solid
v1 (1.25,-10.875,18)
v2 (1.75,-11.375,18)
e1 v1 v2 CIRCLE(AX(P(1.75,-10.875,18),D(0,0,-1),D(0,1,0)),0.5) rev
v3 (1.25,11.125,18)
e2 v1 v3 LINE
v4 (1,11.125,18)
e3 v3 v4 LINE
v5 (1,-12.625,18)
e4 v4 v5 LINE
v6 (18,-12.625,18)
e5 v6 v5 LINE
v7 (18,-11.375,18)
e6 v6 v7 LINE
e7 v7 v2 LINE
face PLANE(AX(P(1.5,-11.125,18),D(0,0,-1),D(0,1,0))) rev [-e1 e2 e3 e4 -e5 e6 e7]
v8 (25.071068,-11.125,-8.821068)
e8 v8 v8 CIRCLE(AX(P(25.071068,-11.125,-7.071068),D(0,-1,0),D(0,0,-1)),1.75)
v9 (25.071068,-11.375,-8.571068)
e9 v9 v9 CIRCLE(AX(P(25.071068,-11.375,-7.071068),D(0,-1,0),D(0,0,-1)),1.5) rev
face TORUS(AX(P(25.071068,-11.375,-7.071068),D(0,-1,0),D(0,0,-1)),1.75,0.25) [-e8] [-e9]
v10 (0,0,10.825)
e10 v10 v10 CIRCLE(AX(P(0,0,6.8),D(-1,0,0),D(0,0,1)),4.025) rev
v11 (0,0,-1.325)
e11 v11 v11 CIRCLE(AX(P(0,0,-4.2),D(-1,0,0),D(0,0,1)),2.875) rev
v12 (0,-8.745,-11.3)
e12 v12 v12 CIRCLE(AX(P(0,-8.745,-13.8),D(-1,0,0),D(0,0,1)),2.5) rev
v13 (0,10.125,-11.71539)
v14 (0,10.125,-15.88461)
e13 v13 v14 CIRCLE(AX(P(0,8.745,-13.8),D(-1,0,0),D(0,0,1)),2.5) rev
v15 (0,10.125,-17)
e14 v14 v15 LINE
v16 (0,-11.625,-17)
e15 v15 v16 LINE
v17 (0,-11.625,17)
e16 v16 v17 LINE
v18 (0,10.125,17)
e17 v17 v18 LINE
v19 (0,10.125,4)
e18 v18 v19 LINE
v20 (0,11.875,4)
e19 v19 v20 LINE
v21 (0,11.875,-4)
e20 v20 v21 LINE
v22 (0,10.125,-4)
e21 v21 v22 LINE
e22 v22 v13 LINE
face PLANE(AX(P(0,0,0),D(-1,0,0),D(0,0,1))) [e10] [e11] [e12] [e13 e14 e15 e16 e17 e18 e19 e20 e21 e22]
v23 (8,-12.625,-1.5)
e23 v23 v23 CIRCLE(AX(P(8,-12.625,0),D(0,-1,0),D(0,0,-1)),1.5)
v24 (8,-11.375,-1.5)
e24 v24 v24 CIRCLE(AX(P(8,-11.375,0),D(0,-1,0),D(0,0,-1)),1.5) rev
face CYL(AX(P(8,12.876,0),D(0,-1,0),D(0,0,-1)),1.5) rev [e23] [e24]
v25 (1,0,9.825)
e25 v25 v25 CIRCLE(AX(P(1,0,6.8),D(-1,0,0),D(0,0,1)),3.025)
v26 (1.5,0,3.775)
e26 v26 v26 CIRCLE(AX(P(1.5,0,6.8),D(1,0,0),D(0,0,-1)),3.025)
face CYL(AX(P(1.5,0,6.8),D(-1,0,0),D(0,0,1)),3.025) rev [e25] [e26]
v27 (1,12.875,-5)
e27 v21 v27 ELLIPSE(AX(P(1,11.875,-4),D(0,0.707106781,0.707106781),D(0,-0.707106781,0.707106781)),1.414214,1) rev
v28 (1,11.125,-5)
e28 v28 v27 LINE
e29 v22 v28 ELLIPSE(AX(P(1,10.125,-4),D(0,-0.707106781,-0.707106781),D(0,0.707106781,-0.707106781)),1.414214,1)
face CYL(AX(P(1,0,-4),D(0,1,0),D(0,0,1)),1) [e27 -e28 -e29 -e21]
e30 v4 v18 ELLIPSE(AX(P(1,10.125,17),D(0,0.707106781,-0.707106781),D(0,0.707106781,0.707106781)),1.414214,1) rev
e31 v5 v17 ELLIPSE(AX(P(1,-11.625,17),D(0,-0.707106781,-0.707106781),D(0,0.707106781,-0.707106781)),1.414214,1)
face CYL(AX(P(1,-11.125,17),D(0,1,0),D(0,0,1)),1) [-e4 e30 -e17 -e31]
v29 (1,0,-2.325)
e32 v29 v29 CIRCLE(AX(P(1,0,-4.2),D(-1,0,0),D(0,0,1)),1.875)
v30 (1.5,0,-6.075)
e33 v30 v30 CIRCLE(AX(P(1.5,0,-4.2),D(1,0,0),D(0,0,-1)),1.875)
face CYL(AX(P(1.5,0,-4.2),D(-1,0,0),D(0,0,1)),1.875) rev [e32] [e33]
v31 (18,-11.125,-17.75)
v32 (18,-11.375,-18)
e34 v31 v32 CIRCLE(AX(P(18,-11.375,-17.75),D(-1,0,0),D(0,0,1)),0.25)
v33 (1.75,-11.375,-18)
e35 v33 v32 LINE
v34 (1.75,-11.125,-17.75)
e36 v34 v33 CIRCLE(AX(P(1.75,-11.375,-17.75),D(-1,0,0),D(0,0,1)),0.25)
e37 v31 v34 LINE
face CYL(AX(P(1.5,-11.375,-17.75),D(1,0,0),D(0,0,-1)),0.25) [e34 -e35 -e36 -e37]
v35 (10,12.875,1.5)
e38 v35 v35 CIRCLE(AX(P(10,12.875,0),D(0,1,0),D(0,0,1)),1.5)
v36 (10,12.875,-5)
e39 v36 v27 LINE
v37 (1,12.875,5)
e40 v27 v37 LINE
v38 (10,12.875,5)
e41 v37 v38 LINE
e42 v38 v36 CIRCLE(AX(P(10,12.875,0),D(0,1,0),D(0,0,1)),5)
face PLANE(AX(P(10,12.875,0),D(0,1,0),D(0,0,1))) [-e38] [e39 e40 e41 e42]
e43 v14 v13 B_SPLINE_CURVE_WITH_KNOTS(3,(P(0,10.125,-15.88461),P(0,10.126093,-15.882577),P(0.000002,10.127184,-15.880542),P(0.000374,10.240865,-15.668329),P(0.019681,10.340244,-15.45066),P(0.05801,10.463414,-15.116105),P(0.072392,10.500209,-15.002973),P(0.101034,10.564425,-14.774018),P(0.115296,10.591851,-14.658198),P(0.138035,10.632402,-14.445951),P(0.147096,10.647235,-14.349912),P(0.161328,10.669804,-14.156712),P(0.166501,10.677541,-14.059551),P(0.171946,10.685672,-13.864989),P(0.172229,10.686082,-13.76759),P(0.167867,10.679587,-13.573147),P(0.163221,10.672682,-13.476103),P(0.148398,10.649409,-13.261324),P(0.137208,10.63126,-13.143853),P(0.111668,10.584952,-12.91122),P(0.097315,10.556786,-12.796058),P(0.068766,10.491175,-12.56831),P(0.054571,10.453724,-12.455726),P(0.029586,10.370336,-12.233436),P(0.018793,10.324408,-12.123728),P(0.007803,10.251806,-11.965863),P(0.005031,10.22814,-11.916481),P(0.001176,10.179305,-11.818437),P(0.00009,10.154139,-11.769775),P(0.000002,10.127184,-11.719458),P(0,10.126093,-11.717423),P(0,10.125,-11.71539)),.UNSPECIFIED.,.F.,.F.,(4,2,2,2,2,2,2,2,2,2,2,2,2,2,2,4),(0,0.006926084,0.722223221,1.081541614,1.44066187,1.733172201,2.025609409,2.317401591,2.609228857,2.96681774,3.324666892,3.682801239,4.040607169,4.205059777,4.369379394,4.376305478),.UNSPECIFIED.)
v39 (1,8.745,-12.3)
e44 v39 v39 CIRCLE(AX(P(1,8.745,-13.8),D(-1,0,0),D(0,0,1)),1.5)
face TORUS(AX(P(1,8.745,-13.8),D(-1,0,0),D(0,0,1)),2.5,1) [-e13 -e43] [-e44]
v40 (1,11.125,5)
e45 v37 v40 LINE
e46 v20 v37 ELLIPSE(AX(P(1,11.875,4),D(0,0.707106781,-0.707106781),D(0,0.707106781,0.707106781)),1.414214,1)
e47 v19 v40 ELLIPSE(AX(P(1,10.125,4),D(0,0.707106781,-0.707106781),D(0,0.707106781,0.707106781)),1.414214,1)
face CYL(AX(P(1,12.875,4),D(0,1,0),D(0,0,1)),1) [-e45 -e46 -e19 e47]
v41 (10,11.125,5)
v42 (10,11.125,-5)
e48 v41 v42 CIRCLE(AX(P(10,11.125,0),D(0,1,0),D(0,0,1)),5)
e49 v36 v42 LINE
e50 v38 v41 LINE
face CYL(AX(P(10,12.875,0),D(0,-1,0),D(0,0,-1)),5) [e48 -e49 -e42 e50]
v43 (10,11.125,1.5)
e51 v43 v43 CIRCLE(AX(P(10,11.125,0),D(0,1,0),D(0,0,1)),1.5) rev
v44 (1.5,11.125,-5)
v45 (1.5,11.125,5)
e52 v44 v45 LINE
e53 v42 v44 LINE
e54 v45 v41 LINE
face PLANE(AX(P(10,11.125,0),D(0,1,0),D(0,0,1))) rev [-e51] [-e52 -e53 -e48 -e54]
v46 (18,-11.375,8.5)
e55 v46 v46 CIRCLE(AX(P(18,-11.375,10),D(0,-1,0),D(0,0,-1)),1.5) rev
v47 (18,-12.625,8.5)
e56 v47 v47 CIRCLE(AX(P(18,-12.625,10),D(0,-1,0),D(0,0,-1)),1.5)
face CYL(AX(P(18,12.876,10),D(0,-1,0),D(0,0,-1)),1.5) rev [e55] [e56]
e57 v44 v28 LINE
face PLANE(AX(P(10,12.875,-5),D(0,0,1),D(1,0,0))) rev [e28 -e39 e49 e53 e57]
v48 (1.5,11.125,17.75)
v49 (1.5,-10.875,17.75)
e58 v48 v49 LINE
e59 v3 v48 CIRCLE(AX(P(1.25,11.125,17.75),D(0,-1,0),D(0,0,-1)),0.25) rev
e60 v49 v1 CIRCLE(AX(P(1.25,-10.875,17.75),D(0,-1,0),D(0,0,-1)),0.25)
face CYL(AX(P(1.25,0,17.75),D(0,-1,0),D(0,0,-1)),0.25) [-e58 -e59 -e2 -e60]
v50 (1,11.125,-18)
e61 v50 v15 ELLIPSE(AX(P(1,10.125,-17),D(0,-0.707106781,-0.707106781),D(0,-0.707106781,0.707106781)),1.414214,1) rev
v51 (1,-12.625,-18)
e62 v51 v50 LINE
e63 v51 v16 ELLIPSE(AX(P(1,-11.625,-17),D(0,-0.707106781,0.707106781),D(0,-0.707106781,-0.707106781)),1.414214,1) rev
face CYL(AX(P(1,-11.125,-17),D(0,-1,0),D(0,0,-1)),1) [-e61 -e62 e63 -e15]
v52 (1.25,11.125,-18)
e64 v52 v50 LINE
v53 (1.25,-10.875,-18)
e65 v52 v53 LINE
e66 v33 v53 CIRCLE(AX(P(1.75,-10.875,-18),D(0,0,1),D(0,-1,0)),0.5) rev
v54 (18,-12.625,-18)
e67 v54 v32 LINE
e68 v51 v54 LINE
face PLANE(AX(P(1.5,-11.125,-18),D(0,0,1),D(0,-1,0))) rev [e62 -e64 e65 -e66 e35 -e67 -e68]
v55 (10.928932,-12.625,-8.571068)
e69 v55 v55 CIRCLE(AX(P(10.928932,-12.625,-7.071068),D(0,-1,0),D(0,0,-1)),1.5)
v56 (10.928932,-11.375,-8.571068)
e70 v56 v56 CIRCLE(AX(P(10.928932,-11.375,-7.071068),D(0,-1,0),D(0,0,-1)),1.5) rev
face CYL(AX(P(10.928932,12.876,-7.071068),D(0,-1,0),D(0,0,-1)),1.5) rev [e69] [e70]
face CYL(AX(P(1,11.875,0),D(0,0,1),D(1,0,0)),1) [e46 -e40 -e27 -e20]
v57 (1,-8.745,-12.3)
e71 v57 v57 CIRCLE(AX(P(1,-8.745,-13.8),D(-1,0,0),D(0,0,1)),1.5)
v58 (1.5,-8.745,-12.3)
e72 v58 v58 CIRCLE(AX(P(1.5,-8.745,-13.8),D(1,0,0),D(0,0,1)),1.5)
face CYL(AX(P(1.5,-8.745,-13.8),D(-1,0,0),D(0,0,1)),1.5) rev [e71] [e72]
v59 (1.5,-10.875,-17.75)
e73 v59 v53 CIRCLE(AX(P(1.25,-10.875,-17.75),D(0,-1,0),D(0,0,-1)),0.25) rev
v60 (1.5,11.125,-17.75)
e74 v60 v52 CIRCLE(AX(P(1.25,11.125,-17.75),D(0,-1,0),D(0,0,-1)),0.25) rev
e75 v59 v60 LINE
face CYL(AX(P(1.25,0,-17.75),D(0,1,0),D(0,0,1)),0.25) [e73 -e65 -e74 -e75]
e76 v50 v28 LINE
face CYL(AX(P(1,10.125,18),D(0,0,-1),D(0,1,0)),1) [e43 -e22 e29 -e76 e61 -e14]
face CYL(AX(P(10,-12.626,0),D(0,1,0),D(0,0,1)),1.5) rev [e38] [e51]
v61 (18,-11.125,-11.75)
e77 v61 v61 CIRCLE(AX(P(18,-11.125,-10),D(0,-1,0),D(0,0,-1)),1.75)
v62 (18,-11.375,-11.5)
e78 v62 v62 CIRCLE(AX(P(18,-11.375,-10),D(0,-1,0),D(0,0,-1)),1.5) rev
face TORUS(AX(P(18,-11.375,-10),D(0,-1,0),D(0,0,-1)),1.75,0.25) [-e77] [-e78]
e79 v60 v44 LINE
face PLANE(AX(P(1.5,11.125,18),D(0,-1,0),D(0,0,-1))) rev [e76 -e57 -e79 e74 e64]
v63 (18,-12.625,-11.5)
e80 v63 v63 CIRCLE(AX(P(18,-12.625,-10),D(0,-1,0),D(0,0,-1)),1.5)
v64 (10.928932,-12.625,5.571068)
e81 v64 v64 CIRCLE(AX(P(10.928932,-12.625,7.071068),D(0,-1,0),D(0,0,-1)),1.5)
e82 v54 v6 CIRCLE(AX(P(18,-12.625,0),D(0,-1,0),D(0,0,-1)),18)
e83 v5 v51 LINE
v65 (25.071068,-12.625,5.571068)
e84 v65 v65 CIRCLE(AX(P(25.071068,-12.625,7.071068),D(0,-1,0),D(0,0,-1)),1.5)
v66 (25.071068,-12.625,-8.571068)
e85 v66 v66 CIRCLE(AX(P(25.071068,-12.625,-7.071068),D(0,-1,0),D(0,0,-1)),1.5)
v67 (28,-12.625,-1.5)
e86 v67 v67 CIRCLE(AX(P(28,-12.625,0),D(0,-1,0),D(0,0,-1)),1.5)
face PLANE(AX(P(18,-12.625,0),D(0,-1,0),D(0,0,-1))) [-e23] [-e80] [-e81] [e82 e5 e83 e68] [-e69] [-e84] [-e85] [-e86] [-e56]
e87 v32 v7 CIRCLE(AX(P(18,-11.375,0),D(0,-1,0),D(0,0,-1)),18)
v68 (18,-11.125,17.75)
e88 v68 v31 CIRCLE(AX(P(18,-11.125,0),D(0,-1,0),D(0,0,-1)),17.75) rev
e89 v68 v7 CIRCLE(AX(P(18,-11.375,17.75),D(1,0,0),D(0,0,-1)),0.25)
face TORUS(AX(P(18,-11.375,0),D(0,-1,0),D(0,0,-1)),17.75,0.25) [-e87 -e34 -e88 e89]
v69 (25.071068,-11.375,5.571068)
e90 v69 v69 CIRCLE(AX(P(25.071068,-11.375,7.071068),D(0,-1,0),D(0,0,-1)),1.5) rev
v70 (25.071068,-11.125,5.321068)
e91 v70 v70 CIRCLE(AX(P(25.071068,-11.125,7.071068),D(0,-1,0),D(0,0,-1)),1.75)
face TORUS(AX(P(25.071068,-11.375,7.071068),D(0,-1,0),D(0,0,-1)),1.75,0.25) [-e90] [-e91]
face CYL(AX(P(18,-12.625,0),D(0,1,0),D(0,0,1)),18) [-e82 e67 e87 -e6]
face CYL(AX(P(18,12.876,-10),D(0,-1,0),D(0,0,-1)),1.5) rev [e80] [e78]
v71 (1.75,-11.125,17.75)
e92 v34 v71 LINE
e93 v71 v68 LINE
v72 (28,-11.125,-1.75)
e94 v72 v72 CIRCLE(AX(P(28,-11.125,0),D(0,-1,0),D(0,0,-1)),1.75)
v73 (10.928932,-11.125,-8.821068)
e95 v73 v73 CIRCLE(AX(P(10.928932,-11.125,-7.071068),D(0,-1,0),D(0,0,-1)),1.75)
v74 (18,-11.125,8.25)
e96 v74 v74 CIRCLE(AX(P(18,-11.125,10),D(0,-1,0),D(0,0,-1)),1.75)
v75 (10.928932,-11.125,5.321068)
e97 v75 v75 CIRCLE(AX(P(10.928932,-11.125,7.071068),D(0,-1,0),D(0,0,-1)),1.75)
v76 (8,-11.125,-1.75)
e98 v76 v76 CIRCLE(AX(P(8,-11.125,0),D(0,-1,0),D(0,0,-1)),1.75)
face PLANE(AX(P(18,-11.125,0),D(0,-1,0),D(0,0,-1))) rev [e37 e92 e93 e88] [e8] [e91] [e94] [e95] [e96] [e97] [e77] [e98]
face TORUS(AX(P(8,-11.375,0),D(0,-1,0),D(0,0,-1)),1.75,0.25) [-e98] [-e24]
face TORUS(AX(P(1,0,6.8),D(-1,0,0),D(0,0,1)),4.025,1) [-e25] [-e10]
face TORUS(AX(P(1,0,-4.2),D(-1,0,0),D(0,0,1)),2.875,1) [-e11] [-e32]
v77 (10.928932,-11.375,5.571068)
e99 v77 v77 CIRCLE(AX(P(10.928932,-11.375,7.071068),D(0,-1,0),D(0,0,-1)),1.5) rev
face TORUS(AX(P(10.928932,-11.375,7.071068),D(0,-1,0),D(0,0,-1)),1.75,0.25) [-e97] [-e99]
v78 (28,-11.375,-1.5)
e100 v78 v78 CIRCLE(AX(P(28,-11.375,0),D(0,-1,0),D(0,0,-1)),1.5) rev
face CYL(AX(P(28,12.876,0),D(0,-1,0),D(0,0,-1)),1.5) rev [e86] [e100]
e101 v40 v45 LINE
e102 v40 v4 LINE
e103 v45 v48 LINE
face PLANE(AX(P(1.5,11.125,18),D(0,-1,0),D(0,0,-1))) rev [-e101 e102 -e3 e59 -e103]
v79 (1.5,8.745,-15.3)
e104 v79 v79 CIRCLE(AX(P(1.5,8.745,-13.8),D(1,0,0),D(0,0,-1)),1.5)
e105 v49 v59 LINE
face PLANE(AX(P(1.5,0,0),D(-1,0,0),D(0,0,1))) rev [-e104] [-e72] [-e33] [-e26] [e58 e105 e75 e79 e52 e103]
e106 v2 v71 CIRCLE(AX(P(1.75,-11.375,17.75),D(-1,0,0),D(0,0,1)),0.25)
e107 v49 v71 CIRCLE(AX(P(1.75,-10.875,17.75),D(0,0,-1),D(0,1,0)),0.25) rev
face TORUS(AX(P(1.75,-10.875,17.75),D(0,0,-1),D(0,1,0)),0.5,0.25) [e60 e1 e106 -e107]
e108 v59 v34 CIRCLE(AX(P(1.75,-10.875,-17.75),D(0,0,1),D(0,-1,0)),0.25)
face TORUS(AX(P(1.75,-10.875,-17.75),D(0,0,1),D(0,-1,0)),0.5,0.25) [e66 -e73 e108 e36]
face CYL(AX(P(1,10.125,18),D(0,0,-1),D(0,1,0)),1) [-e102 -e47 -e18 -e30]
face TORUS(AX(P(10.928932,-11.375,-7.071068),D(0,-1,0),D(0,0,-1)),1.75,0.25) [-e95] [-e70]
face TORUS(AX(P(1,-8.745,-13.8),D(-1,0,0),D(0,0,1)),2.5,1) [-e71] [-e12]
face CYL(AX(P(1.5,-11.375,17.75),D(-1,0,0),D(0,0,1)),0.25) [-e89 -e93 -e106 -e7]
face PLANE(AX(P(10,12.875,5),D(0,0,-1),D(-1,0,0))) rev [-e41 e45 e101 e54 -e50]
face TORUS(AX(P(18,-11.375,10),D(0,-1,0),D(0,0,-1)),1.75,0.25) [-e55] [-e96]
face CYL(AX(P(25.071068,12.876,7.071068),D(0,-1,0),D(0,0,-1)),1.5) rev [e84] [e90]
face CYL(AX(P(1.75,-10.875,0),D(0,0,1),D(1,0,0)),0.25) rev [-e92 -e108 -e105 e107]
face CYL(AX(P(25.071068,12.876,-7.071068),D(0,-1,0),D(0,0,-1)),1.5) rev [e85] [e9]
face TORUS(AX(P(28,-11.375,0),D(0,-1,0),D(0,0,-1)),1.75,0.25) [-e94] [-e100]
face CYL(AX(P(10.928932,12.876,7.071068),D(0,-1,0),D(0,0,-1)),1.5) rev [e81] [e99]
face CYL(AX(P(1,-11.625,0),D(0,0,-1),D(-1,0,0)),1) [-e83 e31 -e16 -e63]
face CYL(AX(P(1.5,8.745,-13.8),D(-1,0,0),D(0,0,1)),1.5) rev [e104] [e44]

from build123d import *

# Parameters (mm, degrees)
CROQUIS1_W              = 36
CROQUIS1_H              = 22.25
CROQUIS1_R              = 1.5
CROQUIS1_R_2            = 3.025
CROQUIS1_R_3            = 1.875
SALIENTE_EXTRUIR1_DEPTH = 1.5
SALIENTE_EXTRUIR3_DEPTH = 1.5
SALIENTE_EXTRUIR4_DEPTH = 1.75
CORTAR_EXTRUIR1_REACH   = 49.647
CROQUIS5_R              = 1.5
CORTAR_EXTRUIR2_REACH   = 49.647
CROQUIS7_R              = 1.5
REDONDEO2_R             = 1
REDONDEO3_R             = 0.25


with BuildPart() as part:
    # Croquis1 → Saliente-Extruir1 (new body)
    with BuildSketch(Plane(origin=(0, 0, 0), x_dir=(0, 0, -1), z_dir=(1, 0, 0))):
        Rectangle(CROQUIS1_W, CROQUIS1_H)
        with Locations((13.8, 8.745)):
            Circle(CROQUIS1_R, mode=Mode.SUBTRACT)
        with Locations((-6.8, 0)):
            Circle(CROQUIS1_R_2, mode=Mode.SUBTRACT)
        with Locations(Location((13.8, -8.745, 0), (0, 0, 180))):
            Circle(CROQUIS1_R, mode=Mode.SUBTRACT)
        with Locations((4.2, 0)):
            Circle(CROQUIS1_R_3, mode=Mode.SUBTRACT)
    extrude(amount=SALIENTE_EXTRUIR1_DEPTH)

    # Croquis3<2> → Saliente-Extruir3 (add)
    with BuildSketch(Plane.XZ.offset(11.125)):
        with BuildLine():
            Line((18, -18), (0, -18))
            Line((0, -18), (0, 18))
            Line((0, 18), (18, 18))
            ThreePointArc((18, 18), (36, 0), (18, -18))
        make_face()
    extrude(amount=SALIENTE_EXTRUIR3_DEPTH)

    # Croquis4 → Saliente-Extruir4 (add)
    with BuildSketch(Plane(origin=(0, 11.125, 0), x_dir=(1, 0, 0), z_dir=(0, 1, 0))):
        with BuildLine():
            Line((10, 5), (0, 5))
            Line((0, 5), (0, -5))
            Line((0, -5), (10, -5))
            ThreePointArc((10, -5), (15, 0), (10, 5))
        make_face()
    extrude(amount=SALIENTE_EXTRUIR4_DEPTH)

    # Croquis5 → Cortar-Extruir1 (cut, up to next)
    with BuildSketch(Plane(origin=(0, 12.875, 0), x_dir=(1, 0, 0), z_dir=(0, 1, 0)), mode=Mode.PRIVATE) as cortar_extruir1_sk1:
        with Locations(Location((10, 0, 0), (0, 0, 270))):
            Circle(CROQUIS5_R)
    cortar_extruir1_tool1 = extrude(cortar_extruir1_sk1.sketch, amount=-CORTAR_EXTRUIR1_REACH, mode=Mode.PRIVATE) & part.part
    add(cortar_extruir1_tool1.solids().sort_by_distance((10, 12.875, 0))[0], mode=Mode.SUBTRACT)

    # Croquis7 → Cortar-Extruir2 (cut, up to next)
    with BuildSketch(Plane.XZ.offset(12.625), mode=Mode.PRIVATE) as cortar_extruir2_sk1:
        with Locations(Location((28, 0, 0), (0, 0, 270))):
            Circle(CROQUIS7_R)
    cortar_extruir2_tool1 = extrude(cortar_extruir2_sk1.sketch, amount=-CORTAR_EXTRUIR2_REACH, mode=Mode.PRIVATE) & part.part
    # Croquis7 → Cortar-Extruir2 (cut, up to next)
    with BuildSketch(Plane.XZ.offset(12.625), mode=Mode.PRIVATE) as cortar_extruir2_sk2:
        with Locations(Location((25.071067812, -7.071067812, 0), (0, 0, 270))):
            Circle(CROQUIS7_R)
    cortar_extruir2_tool2 = extrude(cortar_extruir2_sk2.sketch, amount=-CORTAR_EXTRUIR2_REACH, mode=Mode.PRIVATE) & part.part
    # Croquis7 → Cortar-Extruir2 (cut, up to next)
    with BuildSketch(Plane.XZ.offset(12.625), mode=Mode.PRIVATE) as cortar_extruir2_sk3:
        with Locations(Location((18, -10, 0), (0, 0, 270))):
            Circle(CROQUIS7_R)
    cortar_extruir2_tool3 = extrude(cortar_extruir2_sk3.sketch, amount=-CORTAR_EXTRUIR2_REACH, mode=Mode.PRIVATE) & part.part
    # Croquis7 → Cortar-Extruir2 (cut, up to next)
    with BuildSketch(Plane.XZ.offset(12.625), mode=Mode.PRIVATE) as cortar_extruir2_sk4:
        with Locations(Location((10.928932188, -7.071067812, 0), (0, 0, 270))):
            Circle(CROQUIS7_R)
    cortar_extruir2_tool4 = extrude(cortar_extruir2_sk4.sketch, amount=-CORTAR_EXTRUIR2_REACH, mode=Mode.PRIVATE) & part.part
    # Croquis7 → Cortar-Extruir2 (cut, up to next)
    with BuildSketch(Plane.XZ.offset(12.625), mode=Mode.PRIVATE) as cortar_extruir2_sk5:
        with Locations(Location((8, 0, 0), (0, 0, 270))):
            Circle(CROQUIS7_R)
    cortar_extruir2_tool5 = extrude(cortar_extruir2_sk5.sketch, amount=-CORTAR_EXTRUIR2_REACH, mode=Mode.PRIVATE) & part.part
    # Croquis7 → Cortar-Extruir2 (cut, up to next)
    with BuildSketch(Plane.XZ.offset(12.625), mode=Mode.PRIVATE) as cortar_extruir2_sk6:
        with Locations(Location((10.928932188, 7.071067812, 0), (0, 0, 270))):
            Circle(CROQUIS7_R)
    cortar_extruir2_tool6 = extrude(cortar_extruir2_sk6.sketch, amount=-CORTAR_EXTRUIR2_REACH, mode=Mode.PRIVATE) & part.part
    # Croquis7 → Cortar-Extruir2 (cut, up to next)
    with BuildSketch(Plane.XZ.offset(12.625), mode=Mode.PRIVATE) as cortar_extruir2_sk7:
        with Locations(Location((18, 10, 0), (0, 0, 270))):
            Circle(CROQUIS7_R)
    cortar_extruir2_tool7 = extrude(cortar_extruir2_sk7.sketch, amount=-CORTAR_EXTRUIR2_REACH, mode=Mode.PRIVATE) & part.part
    # Croquis7 → Cortar-Extruir2 (cut, up to next)
    with BuildSketch(Plane.XZ.offset(12.625), mode=Mode.PRIVATE) as cortar_extruir2_sk8:
        with Locations(Location((25.071067812, 7.071067812, 0), (0, 0, 270))):
            Circle(CROQUIS7_R)
    cortar_extruir2_tool8 = extrude(cortar_extruir2_sk8.sketch, amount=-CORTAR_EXTRUIR2_REACH, mode=Mode.PRIVATE) & part.part
    add(cortar_extruir2_tool1.solids().sort_by_distance((28, -12.625, 0))[0], mode=Mode.SUBTRACT)
    add(cortar_extruir2_tool2.solids().sort_by_distance((25.071068, -12.625, -7.071068))[0], mode=Mode.SUBTRACT)
    add(cortar_extruir2_tool3.solids().sort_by_distance((18, -12.625, -10))[0], mode=Mode.SUBTRACT)
    add(cortar_extruir2_tool4.solids().sort_by_distance((10.928932, -12.625, -7.071068))[0], mode=Mode.SUBTRACT)
    add(cortar_extruir2_tool5.solids().sort_by_distance((8, -12.625, 0))[0], mode=Mode.SUBTRACT)
    add(cortar_extruir2_tool6.solids().sort_by_distance((10.928932, -12.625, 7.071068))[0], mode=Mode.SUBTRACT)
    add(cortar_extruir2_tool7.solids().sort_by_distance((18, -12.625, 10))[0], mode=Mode.SUBTRACT)
    add(cortar_extruir2_tool8.solids().sort_by_distance((25.071068, -12.625, 7.071068))[0], mode=Mode.SUBTRACT)

    # Redondeo2
    # the kernel refuses this fillet: 1 mm, written as the material it takes off along each edge
    with BuildSketch(Plane(origin=(0, 8.745, -13.8), x_dir=(0, 0, -1), z_dir=(0, -1, 0))) as redondeo2_piece_1:
        with BuildLine():
            CenterArc((1.5 + REDONDEO2_R, REDONDEO2_R), REDONDEO2_R, 180, 90)
            Line((1.5, REDONDEO2_R), (1.5, 0))
            Line((1.5, 0), (1.5 + REDONDEO2_R, 0))
        make_face()
    revolve(axis=Axis((0, 8.745, -13.8), (1, 0, 0)), mode=Mode.SUBTRACT)
    with BuildSketch(Plane(origin=(0, 0, 6.8), x_dir=(0, 0, -1), z_dir=(0, -1, 0))) as redondeo2_piece_2:
        with BuildLine():
            CenterArc((3.025 + REDONDEO2_R, REDONDEO2_R), REDONDEO2_R, 180, 90)
            Line((3.025, REDONDEO2_R), (3.025, 0))
            Line((3.025, 0), (3.025 + REDONDEO2_R, 0))
        make_face()
    revolve(axis=Axis((0, 0, 6.8), (1, 0, 0)), mode=Mode.SUBTRACT)
    with BuildSketch(Plane(origin=(0, -8.745, -13.8), x_dir=(0, 0, 1), z_dir=(0, 1, 0))) as redondeo2_piece_3:
        with BuildLine():
            CenterArc((1.5 + REDONDEO2_R, REDONDEO2_R), REDONDEO2_R, 180, 90)
            Line((1.5, REDONDEO2_R), (1.5, 0))
            Line((1.5, 0), (1.5 + REDONDEO2_R, 0))
        make_face()
    revolve(axis=Axis((0, -8.745, -13.8), (1, 0, 0)), mode=Mode.SUBTRACT)
    with BuildSketch(Plane(origin=(0, 0, -4.2), x_dir=(0, 0, -1), z_dir=(0, -1, 0))) as redondeo2_piece_4:
        with BuildLine():
            CenterArc((1.875 + REDONDEO2_R, REDONDEO2_R), REDONDEO2_R, 180, 90)
            Line((1.875, REDONDEO2_R), (1.875, 0))
            Line((1.875, 0), (1.875 + REDONDEO2_R, 0))
        make_face()
    revolve(axis=Axis((0, 0, -4.2), (1, 0, 0)), mode=Mode.SUBTRACT)
    with BuildSketch(Plane(origin=(0, -12.625, -20.5), x_dir=(0, 1, 0), z_dir=(0, 0, 1))) as redondeo2_piece_5:
        with BuildLine():
            CenterArc((REDONDEO2_R, -REDONDEO2_R), REDONDEO2_R, 90, 90)
            Line((0, -REDONDEO2_R), (0, 0))
            Line((0, 0), (REDONDEO2_R, 0))
        make_face()
    extrude(amount=41, mode=Mode.SUBTRACT)
    with BuildSketch(Plane(origin=(0, 11.125, 5), x_dir=(0, -1, 0), z_dir=(0, 0, 1))) as redondeo2_piece_6:
        with BuildLine():
            CenterArc((REDONDEO2_R, REDONDEO2_R), REDONDEO2_R, 180, 90)
            Line((0, REDONDEO2_R), (0, 0))
            Line((0, 0), (REDONDEO2_R, 0))
        make_face()
    extrude(amount=15.5, mode=Mode.SUBTRACT)
    with BuildSketch(Plane(origin=(0, 11.125, -5), x_dir=(0, 0, 1), z_dir=(0, 1, 0))) as redondeo2_piece_7:
        with BuildLine():
            CenterArc((REDONDEO2_R, REDONDEO2_R), REDONDEO2_R, 180, 90)
            Line((0, REDONDEO2_R), (0, 0))
            Line((0, 0), (REDONDEO2_R, 0))
        make_face()
    extrude(amount=4.25, mode=Mode.SUBTRACT)
    with BuildSketch(Plane(origin=(0, 11.125, 5), x_dir=(0, 0, -1), z_dir=(0, 1, 0))) as redondeo2_piece_8:
        with BuildLine():
            CenterArc((REDONDEO2_R, -REDONDEO2_R), REDONDEO2_R, 90, 90)
            Line((0, -REDONDEO2_R), (0, 0))
            Line((0, 0), (REDONDEO2_R, 0))
        make_face()
    extrude(amount=4.25, mode=Mode.SUBTRACT)
    with BuildSketch(Plane(origin=(0, 12.875, -7.5), x_dir=(0, -1, 0), z_dir=(0, 0, 1))) as redondeo2_piece_9:
        with BuildLine():
            CenterArc((REDONDEO2_R, REDONDEO2_R), REDONDEO2_R, 180, 90)
            Line((0, REDONDEO2_R), (0, 0))
            Line((0, 0), (REDONDEO2_R, 0))
        make_face()
    extrude(amount=15, mode=Mode.SUBTRACT)
    with BuildSketch(Plane(origin=(0, -15.125, 18), x_dir=(0, 0, -1), z_dir=(0, 1, 0)), Plane(origin=(0, -15.125, -18), x_dir=(1, 0, 0), z_dir=(0, 1, 0))) as redondeo2_piece_10:
        with BuildLine():
            CenterArc((REDONDEO2_R, -REDONDEO2_R), REDONDEO2_R, 90, 90)
            Line((0, -REDONDEO2_R), (0, 0))
            Line((0, 0), (REDONDEO2_R, 0))
        make_face()
    extrude(amount=28.75, mode=Mode.SUBTRACT)
    with BuildSketch(Plane(origin=(0, 11.125, -20.5), x_dir=(1, 0, 0), z_dir=(0, 0, 1))) as redondeo2_piece_11:
        with BuildLine():
            CenterArc((REDONDEO2_R, -REDONDEO2_R), REDONDEO2_R, 90, 90)
            Line((0, -REDONDEO2_R), (0, 0))
            Line((0, 0), (REDONDEO2_R, 0))
        make_face()
    extrude(amount=15.5, mode=Mode.SUBTRACT)
    with BuildSketch(Plane(origin=(0, 8.625, 5), x_dir=(0, 0, -1), z_dir=(0, 1, 0))) as redondeo2_piece_12a_section:
        with BuildLine():
            CenterArc((REDONDEO2_R, -REDONDEO2_R), REDONDEO2_R, 90, 90)
            Line((0, -REDONDEO2_R), (0, 0))
            Line((0, 0), (REDONDEO2_R, 0))
        make_face()
    redondeo2_piece_12a = extrude(amount=6.75, mode=Mode.PRIVATE)
    redondeo2_piece_12a = split(redondeo2_piece_12a, bisect_by=Plane(origin=(0.226395114, 11.125, 4.773604886), z_dir=(0, -1, 0)), keep=Keep.TOP, mode=Mode.PRIVATE)
    with BuildSketch(Plane(origin=(0, 11.125, 2.5), x_dir=(0, -1, 0), z_dir=(0, 0, 1))) as redondeo2_piece_12b_section:
        with BuildLine():
            CenterArc((REDONDEO2_R, REDONDEO2_R), REDONDEO2_R, 180, 90)
            Line((0, REDONDEO2_R), (0, 0))
            Line((0, 0), (REDONDEO2_R, 0))
        make_face()
    redondeo2_piece_12b = extrude(amount=18, mode=Mode.PRIVATE)
    redondeo2_piece_12b = split(redondeo2_piece_12b, bisect_by=Plane(origin=(0.226395114, 10.898604886, 5), z_dir=(0, 0, -1)), keep=Keep.TOP, mode=Mode.PRIVATE)
    redondeo2_piece_12 = redondeo2_piece_12a & redondeo2_piece_12b
    add(redondeo2_piece_12, mode=Mode.SUBTRACT)
    with BuildSketch(Plane(origin=(0, 11.125, -20.5), x_dir=(1, 0, 0), z_dir=(0, 0, 1))) as redondeo2_piece_13a_section:
        with BuildLine():
            CenterArc((REDONDEO2_R, -REDONDEO2_R), REDONDEO2_R, 90, 90)
            Line((0, -REDONDEO2_R), (0, 0))
            Line((0, 0), (REDONDEO2_R, 0))
        make_face()
    redondeo2_piece_13a = extrude(amount=18, mode=Mode.PRIVATE)
    redondeo2_piece_13a = split(redondeo2_piece_13a, bisect_by=Plane(origin=(0.226395114, 10.898604886, -5), z_dir=(0, 0, 1)), keep=Keep.TOP, mode=Mode.PRIVATE)
    with BuildSketch(Plane(origin=(0, 8.625, -5), x_dir=(0, 0, 1), z_dir=(0, 1, 0))) as redondeo2_piece_13b_section:
        with BuildLine():
            CenterArc((REDONDEO2_R, REDONDEO2_R), REDONDEO2_R, 180, 90)
            Line((0, REDONDEO2_R), (0, 0))
            Line((0, 0), (REDONDEO2_R, 0))
        make_face()
    redondeo2_piece_13b = extrude(amount=6.75, mode=Mode.PRIVATE)
    redondeo2_piece_13b = split(redondeo2_piece_13b, bisect_by=Plane(origin=(0.226395114, 11.125, -4.773604886), z_dir=(0, -1, 0)), keep=Keep.TOP, mode=Mode.PRIVATE)
    redondeo2_piece_13 = redondeo2_piece_13a & redondeo2_piece_13b
    add(redondeo2_piece_13, mode=Mode.SUBTRACT)

    # Redondeo3
    redondeo3_edges = [part.edges().sort_by_distance(p)[0] for p in [
        (1.5, 0, 18),
        (1.5, -11.125, 0),
        (36, -11.125, 0),
        (9.75, -11.125, 18),
        (9.75, -11.125, -18),
        (1.5, 0, -18),
        (25.071067812, -11.125, 8.571067812),
        (18, -11.125, 11.5),
        (10.928932188, -11.125, 8.571067812),
        (8, -11.125, 1.5),
        (10.928932188, -11.125, -5.571067812),
        (18, -11.125, -8.5),
        (25.071067812, -11.125, -5.571067812),
        (28, -11.125, 1.5),
    ]]
    fillet(redondeo3_edges, radius=REDONDEO3_R)


solid = part.part
